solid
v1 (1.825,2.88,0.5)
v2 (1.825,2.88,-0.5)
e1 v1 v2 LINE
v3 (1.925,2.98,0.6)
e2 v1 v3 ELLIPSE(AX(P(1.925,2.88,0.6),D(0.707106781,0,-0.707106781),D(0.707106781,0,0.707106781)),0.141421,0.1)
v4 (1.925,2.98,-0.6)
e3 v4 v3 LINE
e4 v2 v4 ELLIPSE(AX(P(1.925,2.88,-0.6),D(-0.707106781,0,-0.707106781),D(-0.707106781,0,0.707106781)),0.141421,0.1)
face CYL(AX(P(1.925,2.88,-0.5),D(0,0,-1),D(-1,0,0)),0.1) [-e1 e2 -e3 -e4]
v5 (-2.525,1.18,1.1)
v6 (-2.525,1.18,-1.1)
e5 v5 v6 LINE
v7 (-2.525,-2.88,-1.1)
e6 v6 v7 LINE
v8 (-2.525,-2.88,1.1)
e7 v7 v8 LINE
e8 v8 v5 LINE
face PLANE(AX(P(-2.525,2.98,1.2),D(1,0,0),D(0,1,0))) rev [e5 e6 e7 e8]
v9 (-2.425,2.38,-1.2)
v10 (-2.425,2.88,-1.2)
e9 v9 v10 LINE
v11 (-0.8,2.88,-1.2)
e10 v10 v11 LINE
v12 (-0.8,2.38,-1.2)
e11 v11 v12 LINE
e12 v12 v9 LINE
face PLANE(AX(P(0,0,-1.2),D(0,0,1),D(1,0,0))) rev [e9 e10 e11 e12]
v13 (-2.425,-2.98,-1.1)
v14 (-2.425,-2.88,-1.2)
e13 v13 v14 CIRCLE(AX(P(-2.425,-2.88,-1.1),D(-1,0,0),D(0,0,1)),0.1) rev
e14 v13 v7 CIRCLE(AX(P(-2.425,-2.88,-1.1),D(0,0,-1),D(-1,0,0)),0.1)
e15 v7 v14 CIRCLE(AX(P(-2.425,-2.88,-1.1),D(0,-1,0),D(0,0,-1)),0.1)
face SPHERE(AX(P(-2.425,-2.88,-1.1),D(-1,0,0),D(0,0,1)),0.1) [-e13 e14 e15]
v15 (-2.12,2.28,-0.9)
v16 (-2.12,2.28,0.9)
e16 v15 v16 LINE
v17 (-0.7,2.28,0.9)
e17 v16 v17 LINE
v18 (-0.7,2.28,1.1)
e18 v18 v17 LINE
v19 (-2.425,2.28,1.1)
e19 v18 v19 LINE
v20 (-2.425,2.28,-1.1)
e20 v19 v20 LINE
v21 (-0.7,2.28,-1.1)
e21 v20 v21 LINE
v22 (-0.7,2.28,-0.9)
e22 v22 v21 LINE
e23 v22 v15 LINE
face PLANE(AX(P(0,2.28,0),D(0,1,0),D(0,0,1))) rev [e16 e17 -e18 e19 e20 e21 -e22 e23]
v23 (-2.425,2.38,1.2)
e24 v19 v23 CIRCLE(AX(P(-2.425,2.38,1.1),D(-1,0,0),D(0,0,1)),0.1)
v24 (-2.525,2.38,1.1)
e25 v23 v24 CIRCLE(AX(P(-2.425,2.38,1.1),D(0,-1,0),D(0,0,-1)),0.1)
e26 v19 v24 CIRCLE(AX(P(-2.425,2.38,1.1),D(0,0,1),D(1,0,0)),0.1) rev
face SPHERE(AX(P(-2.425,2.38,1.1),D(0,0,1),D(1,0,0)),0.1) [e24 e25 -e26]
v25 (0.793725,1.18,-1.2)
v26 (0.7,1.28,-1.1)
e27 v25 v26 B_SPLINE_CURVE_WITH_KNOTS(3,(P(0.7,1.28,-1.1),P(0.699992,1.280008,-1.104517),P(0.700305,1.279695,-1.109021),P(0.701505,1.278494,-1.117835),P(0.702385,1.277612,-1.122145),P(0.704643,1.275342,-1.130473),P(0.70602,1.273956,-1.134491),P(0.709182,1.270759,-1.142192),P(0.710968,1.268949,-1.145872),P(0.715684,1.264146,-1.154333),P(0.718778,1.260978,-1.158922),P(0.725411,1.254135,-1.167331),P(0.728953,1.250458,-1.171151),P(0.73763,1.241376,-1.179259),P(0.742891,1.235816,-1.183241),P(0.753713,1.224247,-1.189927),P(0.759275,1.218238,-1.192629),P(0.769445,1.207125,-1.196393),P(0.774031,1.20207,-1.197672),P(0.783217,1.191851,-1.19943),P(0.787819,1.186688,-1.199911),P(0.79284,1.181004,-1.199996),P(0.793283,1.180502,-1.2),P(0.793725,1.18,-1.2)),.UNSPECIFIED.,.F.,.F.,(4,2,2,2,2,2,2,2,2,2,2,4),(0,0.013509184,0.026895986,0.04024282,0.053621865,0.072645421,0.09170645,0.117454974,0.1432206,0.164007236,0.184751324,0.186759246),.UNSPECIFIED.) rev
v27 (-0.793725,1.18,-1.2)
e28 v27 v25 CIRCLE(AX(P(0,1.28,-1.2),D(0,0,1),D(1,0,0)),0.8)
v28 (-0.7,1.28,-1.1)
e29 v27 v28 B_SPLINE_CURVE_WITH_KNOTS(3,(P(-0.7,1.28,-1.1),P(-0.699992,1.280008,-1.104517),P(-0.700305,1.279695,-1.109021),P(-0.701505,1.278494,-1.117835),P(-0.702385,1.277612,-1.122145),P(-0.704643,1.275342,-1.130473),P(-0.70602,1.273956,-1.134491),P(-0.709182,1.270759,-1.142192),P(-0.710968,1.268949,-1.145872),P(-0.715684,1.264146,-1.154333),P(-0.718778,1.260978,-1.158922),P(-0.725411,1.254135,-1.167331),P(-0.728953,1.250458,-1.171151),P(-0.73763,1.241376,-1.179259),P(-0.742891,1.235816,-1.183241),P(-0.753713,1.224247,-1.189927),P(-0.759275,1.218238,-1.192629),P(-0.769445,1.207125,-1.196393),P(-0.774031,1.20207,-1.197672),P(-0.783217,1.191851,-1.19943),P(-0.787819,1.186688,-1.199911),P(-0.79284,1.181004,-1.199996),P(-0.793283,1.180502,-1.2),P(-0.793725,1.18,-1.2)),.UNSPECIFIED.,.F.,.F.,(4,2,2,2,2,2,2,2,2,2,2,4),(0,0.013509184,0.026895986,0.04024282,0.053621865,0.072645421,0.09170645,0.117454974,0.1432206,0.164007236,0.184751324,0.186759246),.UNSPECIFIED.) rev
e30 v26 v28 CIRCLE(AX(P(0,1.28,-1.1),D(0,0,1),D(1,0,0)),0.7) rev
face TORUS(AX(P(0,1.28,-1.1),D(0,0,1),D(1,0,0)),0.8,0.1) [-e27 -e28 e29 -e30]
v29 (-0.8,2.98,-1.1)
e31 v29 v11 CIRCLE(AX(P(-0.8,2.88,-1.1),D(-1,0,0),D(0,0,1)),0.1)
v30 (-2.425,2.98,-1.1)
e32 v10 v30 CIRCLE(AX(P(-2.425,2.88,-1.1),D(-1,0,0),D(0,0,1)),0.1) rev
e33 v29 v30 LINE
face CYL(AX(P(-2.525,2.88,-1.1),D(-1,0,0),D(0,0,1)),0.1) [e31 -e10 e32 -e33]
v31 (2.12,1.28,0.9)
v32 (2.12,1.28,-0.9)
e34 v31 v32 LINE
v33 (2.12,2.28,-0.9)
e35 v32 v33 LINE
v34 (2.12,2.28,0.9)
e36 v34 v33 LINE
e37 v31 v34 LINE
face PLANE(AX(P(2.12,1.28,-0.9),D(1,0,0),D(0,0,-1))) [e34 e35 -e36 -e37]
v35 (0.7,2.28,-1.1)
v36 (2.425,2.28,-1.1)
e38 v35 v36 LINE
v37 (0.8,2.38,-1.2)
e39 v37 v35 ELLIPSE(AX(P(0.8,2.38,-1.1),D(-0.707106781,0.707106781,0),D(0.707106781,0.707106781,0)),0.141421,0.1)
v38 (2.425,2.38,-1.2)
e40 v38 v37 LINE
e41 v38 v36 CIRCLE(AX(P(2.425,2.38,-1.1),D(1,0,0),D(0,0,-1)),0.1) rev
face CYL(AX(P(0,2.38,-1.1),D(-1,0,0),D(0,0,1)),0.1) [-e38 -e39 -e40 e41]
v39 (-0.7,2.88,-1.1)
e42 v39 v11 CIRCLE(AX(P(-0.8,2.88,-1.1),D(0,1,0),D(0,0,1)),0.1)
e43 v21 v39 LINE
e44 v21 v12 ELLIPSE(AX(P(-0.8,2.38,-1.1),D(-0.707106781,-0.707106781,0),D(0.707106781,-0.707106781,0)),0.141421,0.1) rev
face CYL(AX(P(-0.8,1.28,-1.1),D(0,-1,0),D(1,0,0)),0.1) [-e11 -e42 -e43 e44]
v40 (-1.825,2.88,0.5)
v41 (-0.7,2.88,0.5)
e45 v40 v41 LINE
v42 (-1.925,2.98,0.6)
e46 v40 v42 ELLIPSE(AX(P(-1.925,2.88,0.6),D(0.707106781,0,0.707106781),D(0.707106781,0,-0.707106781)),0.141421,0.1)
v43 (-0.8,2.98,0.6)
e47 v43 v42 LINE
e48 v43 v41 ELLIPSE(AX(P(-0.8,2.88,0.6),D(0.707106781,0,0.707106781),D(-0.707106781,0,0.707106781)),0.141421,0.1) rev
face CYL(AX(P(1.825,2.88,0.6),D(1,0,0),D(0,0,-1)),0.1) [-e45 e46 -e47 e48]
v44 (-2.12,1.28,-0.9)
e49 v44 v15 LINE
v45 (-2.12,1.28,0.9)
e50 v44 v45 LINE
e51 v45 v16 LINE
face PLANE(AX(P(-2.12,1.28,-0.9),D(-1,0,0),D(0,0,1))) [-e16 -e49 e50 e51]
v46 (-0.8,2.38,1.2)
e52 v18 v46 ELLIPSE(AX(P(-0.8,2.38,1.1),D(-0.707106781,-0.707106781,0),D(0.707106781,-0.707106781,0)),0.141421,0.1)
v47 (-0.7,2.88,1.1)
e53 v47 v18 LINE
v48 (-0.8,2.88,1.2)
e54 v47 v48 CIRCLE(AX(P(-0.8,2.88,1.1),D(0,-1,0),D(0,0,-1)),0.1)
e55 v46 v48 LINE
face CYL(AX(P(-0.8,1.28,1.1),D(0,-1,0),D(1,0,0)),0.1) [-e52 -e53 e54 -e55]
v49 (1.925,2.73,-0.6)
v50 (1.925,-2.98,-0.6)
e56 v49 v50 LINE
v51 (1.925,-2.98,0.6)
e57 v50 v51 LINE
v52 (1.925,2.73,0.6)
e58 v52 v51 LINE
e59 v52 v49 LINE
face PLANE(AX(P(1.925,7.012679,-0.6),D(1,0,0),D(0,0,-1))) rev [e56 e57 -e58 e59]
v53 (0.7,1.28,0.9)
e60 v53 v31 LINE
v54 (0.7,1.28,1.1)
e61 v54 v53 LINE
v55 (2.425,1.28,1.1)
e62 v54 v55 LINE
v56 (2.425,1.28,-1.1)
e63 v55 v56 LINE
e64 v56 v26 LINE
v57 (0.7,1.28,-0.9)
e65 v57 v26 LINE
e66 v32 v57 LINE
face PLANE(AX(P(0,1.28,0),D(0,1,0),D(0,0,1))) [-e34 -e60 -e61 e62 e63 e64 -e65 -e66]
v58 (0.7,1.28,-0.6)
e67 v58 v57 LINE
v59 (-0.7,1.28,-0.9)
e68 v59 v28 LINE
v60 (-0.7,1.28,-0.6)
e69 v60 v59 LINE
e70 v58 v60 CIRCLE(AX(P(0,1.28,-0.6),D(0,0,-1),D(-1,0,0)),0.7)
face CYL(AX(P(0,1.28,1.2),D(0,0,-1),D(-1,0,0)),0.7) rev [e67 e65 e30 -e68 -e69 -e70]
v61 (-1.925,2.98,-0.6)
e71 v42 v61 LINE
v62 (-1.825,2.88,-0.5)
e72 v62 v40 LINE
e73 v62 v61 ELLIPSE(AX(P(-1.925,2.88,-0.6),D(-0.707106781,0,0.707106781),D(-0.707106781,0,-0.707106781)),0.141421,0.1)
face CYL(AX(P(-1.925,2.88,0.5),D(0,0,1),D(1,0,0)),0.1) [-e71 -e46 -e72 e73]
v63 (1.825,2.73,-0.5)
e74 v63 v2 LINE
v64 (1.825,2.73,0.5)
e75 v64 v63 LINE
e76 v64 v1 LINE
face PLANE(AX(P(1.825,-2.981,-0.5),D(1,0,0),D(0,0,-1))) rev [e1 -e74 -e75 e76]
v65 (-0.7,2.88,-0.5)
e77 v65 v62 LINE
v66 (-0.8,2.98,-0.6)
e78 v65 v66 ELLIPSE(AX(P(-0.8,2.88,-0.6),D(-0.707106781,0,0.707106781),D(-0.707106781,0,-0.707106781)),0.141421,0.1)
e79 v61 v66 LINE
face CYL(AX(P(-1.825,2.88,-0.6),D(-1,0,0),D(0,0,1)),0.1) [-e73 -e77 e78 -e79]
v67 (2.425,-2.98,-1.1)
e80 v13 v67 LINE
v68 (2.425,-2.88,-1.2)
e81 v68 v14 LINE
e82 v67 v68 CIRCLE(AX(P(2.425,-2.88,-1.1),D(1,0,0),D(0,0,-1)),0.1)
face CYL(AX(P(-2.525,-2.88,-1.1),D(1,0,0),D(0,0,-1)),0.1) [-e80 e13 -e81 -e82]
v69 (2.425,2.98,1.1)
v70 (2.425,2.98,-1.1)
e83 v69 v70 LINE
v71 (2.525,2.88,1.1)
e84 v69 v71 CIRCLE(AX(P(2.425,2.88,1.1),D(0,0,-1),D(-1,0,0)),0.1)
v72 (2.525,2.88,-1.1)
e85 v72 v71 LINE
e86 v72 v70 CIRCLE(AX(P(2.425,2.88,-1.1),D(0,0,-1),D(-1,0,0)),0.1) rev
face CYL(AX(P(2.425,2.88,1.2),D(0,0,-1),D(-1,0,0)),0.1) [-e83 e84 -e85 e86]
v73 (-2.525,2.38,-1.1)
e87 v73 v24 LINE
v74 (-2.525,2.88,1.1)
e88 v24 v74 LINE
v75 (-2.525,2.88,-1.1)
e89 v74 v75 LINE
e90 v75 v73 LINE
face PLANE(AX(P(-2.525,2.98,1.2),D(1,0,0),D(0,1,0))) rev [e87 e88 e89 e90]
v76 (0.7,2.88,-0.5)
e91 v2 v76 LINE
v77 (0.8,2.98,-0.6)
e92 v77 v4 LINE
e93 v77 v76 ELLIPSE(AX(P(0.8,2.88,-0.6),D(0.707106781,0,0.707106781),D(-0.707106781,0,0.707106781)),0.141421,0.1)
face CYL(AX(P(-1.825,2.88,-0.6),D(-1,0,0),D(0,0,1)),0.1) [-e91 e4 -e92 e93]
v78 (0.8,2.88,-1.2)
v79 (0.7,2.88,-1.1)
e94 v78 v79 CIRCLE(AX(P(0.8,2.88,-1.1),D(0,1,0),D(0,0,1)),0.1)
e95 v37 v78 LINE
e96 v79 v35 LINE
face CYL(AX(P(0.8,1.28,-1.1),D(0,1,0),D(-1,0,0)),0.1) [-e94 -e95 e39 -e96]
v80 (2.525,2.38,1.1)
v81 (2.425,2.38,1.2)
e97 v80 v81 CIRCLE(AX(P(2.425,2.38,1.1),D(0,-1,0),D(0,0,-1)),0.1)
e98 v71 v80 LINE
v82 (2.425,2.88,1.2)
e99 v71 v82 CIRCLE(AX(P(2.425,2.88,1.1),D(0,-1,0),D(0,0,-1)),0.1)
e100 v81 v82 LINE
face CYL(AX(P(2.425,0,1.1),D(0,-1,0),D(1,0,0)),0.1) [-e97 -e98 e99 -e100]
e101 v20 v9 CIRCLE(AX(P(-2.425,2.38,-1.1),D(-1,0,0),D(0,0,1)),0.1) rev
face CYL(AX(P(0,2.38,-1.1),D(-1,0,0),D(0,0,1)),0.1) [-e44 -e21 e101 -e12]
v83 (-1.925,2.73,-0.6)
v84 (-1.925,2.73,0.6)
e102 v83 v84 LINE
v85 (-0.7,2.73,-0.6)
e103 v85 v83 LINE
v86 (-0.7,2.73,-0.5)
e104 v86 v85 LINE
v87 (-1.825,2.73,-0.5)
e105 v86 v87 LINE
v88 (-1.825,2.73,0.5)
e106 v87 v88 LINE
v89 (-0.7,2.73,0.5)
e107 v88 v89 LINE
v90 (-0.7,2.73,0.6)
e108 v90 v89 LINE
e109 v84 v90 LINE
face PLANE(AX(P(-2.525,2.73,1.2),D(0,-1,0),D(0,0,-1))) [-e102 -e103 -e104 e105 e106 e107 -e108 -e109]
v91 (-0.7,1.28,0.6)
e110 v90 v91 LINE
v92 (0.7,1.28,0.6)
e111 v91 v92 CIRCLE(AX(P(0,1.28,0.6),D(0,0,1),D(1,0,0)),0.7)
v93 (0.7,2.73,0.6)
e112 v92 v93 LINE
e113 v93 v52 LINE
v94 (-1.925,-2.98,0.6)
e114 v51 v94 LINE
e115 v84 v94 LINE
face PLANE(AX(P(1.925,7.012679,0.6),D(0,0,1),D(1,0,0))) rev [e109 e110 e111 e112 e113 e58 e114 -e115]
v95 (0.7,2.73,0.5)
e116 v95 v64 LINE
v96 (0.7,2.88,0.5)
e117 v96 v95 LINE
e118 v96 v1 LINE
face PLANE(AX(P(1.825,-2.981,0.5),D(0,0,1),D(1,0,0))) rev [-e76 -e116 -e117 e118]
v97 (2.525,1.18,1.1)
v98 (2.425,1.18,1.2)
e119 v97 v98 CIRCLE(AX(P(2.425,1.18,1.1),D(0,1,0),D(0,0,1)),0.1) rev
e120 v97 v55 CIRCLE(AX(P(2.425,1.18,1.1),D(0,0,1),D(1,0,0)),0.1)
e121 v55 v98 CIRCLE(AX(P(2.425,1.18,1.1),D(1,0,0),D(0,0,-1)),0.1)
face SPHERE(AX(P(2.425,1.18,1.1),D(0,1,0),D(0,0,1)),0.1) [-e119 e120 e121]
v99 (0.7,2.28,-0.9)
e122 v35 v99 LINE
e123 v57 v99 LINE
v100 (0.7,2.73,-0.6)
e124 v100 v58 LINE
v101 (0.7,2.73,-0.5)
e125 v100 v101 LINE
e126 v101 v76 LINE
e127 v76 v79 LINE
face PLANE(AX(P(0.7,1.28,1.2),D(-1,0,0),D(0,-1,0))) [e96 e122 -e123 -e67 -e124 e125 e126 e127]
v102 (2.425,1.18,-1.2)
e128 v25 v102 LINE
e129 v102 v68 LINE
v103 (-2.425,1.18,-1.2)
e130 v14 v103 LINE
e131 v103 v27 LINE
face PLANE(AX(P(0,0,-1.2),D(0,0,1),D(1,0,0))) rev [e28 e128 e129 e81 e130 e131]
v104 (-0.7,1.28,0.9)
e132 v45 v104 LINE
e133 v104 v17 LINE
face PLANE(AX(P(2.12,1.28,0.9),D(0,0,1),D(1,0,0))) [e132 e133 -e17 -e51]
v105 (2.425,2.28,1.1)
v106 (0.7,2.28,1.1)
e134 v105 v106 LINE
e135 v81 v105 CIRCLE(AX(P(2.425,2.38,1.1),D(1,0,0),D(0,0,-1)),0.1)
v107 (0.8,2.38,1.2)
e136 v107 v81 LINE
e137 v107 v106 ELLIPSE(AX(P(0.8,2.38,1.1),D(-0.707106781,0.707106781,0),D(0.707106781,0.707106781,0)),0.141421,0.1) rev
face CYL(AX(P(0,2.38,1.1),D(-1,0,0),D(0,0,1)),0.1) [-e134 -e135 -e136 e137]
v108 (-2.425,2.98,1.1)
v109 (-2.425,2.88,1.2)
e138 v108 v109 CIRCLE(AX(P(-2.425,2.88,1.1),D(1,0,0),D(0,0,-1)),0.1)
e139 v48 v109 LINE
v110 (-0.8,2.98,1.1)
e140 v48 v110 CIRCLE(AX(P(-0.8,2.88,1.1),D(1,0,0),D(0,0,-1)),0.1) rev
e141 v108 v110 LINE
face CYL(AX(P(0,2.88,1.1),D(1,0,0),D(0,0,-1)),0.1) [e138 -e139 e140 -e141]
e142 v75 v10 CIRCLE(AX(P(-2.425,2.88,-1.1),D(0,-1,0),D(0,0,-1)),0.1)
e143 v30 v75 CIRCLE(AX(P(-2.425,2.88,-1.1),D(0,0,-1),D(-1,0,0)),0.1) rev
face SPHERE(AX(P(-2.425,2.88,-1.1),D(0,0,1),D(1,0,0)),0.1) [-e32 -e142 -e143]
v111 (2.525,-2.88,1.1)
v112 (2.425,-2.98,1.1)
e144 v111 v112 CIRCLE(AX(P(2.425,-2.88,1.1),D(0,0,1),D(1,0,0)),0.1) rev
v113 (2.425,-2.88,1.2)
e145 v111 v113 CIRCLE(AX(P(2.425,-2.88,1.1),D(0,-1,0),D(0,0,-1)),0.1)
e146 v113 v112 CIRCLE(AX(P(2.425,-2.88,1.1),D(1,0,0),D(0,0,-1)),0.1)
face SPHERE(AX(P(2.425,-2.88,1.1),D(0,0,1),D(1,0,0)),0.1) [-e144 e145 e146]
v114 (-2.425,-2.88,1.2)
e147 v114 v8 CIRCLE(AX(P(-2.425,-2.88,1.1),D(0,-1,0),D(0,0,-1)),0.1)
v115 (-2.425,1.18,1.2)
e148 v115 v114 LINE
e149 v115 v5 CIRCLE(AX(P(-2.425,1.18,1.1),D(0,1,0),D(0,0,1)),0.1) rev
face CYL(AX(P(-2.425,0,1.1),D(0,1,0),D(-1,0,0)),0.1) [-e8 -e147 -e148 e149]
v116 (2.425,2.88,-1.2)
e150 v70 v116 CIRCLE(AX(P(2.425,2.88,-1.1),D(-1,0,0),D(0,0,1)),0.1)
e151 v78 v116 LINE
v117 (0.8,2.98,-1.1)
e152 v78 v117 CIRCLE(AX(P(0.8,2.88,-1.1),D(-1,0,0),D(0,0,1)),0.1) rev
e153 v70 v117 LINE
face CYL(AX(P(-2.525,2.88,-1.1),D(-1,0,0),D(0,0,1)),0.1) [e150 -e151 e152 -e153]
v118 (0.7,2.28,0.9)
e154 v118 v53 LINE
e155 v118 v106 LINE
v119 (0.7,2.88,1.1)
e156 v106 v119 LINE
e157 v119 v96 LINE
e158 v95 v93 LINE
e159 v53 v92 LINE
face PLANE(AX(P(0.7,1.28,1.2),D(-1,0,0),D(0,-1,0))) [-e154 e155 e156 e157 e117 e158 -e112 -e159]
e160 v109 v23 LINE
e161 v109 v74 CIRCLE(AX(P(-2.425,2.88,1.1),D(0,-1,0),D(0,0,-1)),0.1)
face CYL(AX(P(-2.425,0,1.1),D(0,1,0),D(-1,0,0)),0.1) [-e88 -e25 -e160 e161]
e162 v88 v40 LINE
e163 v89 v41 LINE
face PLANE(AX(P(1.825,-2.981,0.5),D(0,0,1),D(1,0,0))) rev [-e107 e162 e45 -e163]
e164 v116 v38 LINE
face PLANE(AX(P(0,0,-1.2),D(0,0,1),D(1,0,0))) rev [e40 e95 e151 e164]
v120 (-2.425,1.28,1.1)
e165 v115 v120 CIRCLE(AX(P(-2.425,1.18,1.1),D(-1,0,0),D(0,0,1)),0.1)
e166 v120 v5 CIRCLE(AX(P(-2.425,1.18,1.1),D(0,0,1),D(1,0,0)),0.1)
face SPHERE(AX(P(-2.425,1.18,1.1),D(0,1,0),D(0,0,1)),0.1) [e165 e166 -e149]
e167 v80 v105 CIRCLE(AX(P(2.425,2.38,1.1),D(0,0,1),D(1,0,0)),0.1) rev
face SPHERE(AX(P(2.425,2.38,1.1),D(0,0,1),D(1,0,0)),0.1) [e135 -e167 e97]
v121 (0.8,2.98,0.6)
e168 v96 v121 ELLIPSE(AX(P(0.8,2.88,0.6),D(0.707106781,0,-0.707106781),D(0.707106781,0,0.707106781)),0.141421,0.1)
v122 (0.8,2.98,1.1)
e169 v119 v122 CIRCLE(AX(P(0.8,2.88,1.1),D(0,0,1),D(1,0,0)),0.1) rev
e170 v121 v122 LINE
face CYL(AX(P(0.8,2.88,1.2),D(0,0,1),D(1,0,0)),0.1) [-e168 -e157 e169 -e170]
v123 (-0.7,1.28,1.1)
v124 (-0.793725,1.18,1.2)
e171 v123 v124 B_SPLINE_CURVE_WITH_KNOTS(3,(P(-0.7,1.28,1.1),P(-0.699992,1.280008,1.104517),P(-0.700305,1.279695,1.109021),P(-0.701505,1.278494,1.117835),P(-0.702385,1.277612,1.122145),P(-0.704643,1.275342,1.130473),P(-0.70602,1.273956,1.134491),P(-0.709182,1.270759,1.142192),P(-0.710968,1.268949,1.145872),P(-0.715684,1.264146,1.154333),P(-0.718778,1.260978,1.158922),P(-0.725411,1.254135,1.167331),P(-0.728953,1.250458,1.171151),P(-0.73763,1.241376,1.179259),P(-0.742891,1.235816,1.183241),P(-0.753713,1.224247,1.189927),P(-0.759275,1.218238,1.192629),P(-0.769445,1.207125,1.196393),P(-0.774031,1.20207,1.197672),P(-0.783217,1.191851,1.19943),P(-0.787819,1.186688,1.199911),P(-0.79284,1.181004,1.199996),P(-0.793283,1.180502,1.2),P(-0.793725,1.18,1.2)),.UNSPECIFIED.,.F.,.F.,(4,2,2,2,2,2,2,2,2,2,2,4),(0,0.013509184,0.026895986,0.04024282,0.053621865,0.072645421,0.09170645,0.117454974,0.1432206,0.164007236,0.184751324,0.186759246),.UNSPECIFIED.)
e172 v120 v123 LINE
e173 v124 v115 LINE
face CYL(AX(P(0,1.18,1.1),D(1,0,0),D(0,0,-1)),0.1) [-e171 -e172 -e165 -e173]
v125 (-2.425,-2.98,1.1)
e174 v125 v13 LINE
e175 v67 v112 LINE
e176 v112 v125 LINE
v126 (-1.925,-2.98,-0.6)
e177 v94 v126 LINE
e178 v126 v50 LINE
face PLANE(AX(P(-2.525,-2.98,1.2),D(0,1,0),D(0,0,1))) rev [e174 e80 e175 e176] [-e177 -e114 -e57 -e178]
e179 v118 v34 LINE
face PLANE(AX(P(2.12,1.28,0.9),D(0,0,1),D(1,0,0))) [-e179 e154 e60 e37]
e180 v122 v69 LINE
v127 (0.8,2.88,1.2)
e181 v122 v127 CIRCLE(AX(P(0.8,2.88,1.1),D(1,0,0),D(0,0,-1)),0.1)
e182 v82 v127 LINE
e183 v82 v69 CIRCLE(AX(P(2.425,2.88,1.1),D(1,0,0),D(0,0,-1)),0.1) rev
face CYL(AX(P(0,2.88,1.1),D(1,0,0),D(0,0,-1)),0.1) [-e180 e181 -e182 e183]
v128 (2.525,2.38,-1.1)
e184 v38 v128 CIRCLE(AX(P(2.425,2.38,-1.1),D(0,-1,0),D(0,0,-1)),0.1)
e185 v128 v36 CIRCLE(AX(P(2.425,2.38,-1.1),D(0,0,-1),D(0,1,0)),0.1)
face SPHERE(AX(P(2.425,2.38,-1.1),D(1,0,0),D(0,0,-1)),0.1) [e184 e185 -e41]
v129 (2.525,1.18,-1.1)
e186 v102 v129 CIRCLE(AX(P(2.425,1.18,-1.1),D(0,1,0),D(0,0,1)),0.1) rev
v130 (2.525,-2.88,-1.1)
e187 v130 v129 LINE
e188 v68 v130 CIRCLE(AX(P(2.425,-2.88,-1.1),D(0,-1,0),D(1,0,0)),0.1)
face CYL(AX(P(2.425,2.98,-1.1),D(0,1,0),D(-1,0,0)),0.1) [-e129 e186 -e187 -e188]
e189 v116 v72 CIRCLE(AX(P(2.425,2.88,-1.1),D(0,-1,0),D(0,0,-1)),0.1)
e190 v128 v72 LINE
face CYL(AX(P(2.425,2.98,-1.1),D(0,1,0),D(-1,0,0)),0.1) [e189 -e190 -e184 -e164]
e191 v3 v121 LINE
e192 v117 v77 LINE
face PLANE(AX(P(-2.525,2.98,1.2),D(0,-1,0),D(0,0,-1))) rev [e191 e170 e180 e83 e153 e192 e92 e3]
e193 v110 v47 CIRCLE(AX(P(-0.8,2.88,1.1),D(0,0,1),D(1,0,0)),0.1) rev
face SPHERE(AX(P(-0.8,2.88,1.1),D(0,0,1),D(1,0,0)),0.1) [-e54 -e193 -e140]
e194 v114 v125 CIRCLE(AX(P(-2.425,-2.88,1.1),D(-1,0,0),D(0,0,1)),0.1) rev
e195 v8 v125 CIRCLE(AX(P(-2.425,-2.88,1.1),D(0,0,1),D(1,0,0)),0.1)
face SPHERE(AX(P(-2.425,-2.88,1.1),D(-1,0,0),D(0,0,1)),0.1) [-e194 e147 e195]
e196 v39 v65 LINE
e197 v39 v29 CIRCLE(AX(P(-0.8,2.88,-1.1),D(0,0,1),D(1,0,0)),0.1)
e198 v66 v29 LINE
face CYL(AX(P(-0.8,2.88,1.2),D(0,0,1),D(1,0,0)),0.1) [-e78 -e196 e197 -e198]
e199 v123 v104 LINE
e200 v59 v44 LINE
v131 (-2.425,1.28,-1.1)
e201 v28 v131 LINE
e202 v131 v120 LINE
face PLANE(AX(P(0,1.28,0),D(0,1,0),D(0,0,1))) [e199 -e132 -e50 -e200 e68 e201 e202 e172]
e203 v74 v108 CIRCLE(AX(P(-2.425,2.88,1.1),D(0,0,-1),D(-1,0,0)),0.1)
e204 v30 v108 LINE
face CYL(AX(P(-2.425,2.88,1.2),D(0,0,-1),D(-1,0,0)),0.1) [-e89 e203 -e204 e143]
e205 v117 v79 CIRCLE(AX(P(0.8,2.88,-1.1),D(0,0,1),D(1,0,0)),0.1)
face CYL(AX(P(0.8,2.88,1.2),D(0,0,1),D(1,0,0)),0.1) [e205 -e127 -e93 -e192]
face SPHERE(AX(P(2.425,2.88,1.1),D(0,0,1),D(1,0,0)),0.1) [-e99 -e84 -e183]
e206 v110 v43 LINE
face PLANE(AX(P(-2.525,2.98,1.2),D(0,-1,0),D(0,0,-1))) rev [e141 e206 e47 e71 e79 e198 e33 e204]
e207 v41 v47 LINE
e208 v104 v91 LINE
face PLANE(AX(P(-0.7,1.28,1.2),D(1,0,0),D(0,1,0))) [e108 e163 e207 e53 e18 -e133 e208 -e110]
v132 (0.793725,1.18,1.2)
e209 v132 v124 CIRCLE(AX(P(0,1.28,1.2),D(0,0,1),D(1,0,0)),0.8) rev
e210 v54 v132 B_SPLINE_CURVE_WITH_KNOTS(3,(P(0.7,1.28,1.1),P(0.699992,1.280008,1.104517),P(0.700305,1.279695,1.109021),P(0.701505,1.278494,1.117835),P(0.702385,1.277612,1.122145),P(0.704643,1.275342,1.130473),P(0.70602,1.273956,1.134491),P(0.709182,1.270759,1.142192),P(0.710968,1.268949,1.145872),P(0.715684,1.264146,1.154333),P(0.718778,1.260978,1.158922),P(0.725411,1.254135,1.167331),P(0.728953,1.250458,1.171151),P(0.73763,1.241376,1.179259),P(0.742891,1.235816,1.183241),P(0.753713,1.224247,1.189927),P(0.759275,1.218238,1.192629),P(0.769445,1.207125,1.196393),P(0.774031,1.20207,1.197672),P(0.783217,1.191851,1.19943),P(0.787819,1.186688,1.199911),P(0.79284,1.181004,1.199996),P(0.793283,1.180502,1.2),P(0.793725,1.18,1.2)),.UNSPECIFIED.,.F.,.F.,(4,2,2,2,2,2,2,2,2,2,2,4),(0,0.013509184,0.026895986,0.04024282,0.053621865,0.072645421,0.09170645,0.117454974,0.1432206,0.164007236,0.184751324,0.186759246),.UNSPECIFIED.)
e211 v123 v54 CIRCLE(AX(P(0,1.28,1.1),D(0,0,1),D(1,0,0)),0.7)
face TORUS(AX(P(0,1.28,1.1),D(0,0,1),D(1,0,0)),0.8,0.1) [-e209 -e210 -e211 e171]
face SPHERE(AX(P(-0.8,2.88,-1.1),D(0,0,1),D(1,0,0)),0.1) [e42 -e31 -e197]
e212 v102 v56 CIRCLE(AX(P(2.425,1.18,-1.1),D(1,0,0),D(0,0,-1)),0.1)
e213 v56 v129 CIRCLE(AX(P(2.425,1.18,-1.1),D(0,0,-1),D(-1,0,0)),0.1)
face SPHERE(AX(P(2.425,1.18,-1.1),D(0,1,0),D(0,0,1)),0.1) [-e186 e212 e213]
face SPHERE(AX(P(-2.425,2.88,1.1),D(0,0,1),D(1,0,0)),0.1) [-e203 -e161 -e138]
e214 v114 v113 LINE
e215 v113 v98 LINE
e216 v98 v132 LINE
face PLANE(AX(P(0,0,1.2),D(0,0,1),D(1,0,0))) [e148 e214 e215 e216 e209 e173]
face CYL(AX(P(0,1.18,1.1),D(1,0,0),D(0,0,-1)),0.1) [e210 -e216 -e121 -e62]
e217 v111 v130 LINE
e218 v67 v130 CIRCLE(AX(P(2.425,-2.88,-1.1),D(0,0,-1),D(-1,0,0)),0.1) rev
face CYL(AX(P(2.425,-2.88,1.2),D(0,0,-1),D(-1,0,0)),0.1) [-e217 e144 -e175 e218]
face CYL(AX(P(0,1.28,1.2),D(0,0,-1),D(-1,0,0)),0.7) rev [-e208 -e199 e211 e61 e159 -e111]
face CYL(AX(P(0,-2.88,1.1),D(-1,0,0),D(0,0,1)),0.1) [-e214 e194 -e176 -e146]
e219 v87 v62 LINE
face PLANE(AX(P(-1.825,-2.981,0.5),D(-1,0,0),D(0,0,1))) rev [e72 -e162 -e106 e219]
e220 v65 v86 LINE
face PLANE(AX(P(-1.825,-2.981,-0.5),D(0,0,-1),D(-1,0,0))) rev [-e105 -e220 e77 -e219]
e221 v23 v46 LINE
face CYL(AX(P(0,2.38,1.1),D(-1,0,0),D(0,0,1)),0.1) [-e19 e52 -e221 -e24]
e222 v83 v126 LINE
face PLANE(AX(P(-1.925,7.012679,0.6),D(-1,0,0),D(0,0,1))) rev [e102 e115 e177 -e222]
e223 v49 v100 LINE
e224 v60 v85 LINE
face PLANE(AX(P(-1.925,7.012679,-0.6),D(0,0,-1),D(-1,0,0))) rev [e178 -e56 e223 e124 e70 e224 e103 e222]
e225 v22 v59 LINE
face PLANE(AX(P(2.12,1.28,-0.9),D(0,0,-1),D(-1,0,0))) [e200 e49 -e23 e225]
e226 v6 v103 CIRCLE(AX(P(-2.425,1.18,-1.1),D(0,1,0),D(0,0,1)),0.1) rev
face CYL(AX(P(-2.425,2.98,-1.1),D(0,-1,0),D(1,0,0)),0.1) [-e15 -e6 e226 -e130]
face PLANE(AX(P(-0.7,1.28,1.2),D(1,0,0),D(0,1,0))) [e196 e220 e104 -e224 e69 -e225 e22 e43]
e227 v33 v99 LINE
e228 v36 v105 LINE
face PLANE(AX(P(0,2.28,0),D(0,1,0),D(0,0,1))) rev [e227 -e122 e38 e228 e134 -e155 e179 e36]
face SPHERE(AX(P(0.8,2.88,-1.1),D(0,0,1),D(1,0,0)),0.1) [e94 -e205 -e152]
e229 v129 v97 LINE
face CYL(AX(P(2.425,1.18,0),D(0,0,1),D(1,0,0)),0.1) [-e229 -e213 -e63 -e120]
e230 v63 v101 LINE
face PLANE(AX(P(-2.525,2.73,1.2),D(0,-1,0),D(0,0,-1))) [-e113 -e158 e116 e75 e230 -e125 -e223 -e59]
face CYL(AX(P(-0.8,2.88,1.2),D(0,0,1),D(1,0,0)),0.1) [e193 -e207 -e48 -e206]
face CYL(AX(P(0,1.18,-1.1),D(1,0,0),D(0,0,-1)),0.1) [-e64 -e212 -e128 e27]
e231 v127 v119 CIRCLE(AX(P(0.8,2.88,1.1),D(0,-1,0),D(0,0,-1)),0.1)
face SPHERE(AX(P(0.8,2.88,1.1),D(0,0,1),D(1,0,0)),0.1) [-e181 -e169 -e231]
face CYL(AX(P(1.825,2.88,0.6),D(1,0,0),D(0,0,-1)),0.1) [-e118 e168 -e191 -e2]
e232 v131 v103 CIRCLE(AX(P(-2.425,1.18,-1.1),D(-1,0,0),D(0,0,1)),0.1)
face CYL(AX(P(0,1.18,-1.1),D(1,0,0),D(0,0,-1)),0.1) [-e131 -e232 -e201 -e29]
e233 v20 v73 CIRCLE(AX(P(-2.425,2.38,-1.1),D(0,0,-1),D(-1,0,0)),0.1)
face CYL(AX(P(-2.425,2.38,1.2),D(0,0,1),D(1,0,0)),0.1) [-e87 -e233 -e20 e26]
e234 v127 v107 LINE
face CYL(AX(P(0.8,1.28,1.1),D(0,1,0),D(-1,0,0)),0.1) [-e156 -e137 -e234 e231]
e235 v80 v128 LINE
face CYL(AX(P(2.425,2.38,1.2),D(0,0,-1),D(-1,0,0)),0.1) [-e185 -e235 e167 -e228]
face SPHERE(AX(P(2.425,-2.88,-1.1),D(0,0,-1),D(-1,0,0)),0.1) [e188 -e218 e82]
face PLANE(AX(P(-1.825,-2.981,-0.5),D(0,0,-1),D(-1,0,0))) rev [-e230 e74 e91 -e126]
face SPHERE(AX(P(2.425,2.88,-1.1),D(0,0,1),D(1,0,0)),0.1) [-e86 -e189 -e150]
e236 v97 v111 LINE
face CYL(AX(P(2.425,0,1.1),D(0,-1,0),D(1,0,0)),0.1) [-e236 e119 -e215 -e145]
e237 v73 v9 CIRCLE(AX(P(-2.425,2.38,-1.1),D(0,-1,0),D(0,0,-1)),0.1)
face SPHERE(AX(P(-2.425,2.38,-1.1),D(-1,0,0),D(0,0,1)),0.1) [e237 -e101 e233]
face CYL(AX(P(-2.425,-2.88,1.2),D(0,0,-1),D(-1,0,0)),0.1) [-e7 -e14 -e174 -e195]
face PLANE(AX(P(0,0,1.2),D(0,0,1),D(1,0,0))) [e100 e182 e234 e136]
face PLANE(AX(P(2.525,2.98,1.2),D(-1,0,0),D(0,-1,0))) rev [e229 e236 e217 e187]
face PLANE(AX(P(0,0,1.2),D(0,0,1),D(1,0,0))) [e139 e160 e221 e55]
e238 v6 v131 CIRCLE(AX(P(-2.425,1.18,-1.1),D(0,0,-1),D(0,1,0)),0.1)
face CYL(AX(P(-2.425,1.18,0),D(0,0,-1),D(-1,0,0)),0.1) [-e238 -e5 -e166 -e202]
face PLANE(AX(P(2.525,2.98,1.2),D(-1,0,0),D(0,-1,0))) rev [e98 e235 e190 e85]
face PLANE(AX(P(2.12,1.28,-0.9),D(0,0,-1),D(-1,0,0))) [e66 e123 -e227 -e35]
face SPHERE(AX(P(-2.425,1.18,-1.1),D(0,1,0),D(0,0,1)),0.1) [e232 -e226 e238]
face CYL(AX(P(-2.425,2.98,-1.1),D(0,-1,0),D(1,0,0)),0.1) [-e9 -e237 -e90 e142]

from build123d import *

# Parameters (mm, degrees)
SKETCH1_W          = 5.05
SKETCH1_H          = 5.96
MAIN_BODY_DEPTH    = 1.2
SKETCH2_W          = 5.05
SKETCH2_H          = 2.4
SKETCH2_W_2        = 4.24
SKETCH2_H_2        = 1.8
CUT_EXTRUDE1_DEPTH = 1
CUT_EXTRUDE2_START = -2.4
CUT_EXTRUDE2_DEPTH = 2.4
SKETCH4_W          = 3.85
SKETCH4_H          = 1.2
CUT_EXTRUDE3_DEPTH = 5.71
CUT_EXTRUDE4_START = -0.25
SKETCH5_W          = 3.65
SKETCH5_H          = 1
CUT_EXTRUDE4_DEPTH = 0.25
FILLET1_R          = 0.1
FILLET2_R          = 0.1


# Read off the part's stored shape, not the designer's step: Cut-Extrude2
with BuildPart() as part:
    # Sketch1 → Main Body (new, symmetric)
    with BuildSketch(Plane.XY):
        Rectangle(SKETCH1_W, SKETCH1_H)
    extrude(amount=MAIN_BODY_DEPTH, both=True)

    # Sketch2 → Cut-Extrude1 (cut)
    with BuildSketch(Plane(origin=(0, 2.28, 0), x_dir=(1, 0, 0), z_dir=(0, 1, 0))):
        Rectangle(SKETCH2_W, SKETCH2_H)
        Rectangle(SKETCH2_W_2, SKETCH2_H_2, mode=Mode.SUBTRACT)
    extrude(amount=-CUT_EXTRUDE1_DEPTH, mode=Mode.SUBTRACT)

    # Cut-Extrude2 outline → Cut-Extrude2 (cut)
    with BuildSketch(Plane.XY.offset(1.2).offset(CUT_EXTRUDE2_START)):
        with BuildLine():
            ThreePointArc((-0.7, 1.28), (0, 0.58), (0.7, 1.28))
            Line((0.7, 1.28), (0.7, 2.98))
            Line((0.7, 2.98), (-0.7, 2.98))
            Line((-0.7, 2.98), (-0.7, 1.28))
        make_face()
    extrude(amount=CUT_EXTRUDE2_DEPTH, mode=Mode.SUBTRACT)

    # Sketch4 → Cut-Extrude3 (cut)
    with BuildSketch(Plane.XZ.offset(2.98)):
        Rectangle(SKETCH4_W, SKETCH4_H)
    extrude(amount=-CUT_EXTRUDE3_DEPTH, mode=Mode.SUBTRACT)

    # Sketch5 → Cut-Extrude4 (cut)
    with BuildSketch(Plane(origin=(0, 2.98, 0), x_dir=(1, 0, 0), z_dir=(0, 1, 0)).offset(CUT_EXTRUDE4_START)):
        Rectangle(SKETCH5_W, SKETCH5_H)
    extrude(amount=CUT_EXTRUDE4_DEPTH, mode=Mode.SUBTRACT)

    # Fillet1
    fillet1_edges = [part.edges().sort_by_distance(p)[0] for p in [
        (-1.2625, 2.98, 0.5),
        (-0.7, 2.98, 0.85),
        (-1.6125, 2.98, 1.2),
        (-2.525, 2.98, 0),
        (-1.6125, 2.98, -1.2),
        (-0.7, 2.98, -0.85),
        (-1.2625, 2.98, -0.5),
        (-1.825, 2.98, 0),
        (1.2625, 2.98, -0.5),
        (0.7, 2.98, -0.85),
        (1.6125, 2.98, -1.2),
        (2.525, 2.98, 0),
        (1.6125, 2.98, 1.2),
        (0.7, 2.98, 0.85),
        (1.2625, 2.98, 0.5),
        (1.825, 2.98, 0),
        (2.525, -2.98, 0),
        (2.525, 1.28, 0),
        (-1.6125, 1.28, -1.2),
        (0, -2.98, -1.2),
        (2.525, -0.85, -1.2),
        (1.6125, 1.28, -1.2),
        (0, 0.58, -1.2),
        (1.6125, 1.28, 1.2),
        (2.525, -0.85, 1.2),
        (0, -2.98, 1.2),
        (-1.6125, 1.28, 1.2),
        (0, 0.58, 1.2),
        (-2.525, -0.85, 1.2),
        (-2.525, -2.98, 0),
        (-2.525, -0.85, -1.2),
        (-2.525, 1.28, 0),
    ]]
    fillet(fillet1_edges, radius=FILLET1_R)

    # Fillet2
    # the kernel refuses this fillet: 0.1 mm, written as the material it takes off along each edge
    with BuildSketch(Plane(origin=(-0.8, 2.88, -1.1), x_dir=(0, 0, -1), z_dir=(1, 0, 0))) as fillet2_piece_1_section:
        Polygon((0, 0), (FILLET2_R, 0), (FILLET2_R, FILLET2_R), (0, FILLET2_R), align=None)
    fillet2_piece_1 = extrude(amount=FILLET2_R, mode=Mode.PRIVATE)
    fillet2_piece_1 = fillet2_piece_1 - Plane(origin=(-0.8, 2.88, -1.1), x_dir=(0, -0.7071067811865475, 0.7071067811865475), z_dir=(1, 0, 0)) * Sphere(FILLET2_R, mode=Mode.PRIVATE)
    add(fillet2_piece_1, mode=Mode.SUBTRACT)
    with BuildSketch(Plane(origin=(-2.425, 2.88, -1.1), x_dir=(0, 0, -1), z_dir=(-1, 0, 0))) as fillet2_piece_2_section:
        Polygon((0, 0), (FILLET2_R, 0), (FILLET2_R, -FILLET2_R), (0, -FILLET2_R), align=None)
    fillet2_piece_2 = extrude(amount=FILLET2_R, mode=Mode.PRIVATE)
    fillet2_piece_2 = fillet2_piece_2 - Plane(origin=(-2.425, 2.88, -1.1), x_dir=(0, -0.7071067811865475, 0.7071067811865475), z_dir=(-1, 0, 0)) * Sphere(FILLET2_R, mode=Mode.PRIVATE)
    add(fillet2_piece_2, mode=Mode.SUBTRACT)
    with BuildSketch(Plane(origin=(-2.425, 2.88, 1.1), x_dir=(-1, 0, 0), z_dir=(0, 0, 1))) as fillet2_piece_3_section:
        Polygon((0, 0), (FILLET2_R, 0), (FILLET2_R, -FILLET2_R), (0, -FILLET2_R), align=None)
    fillet2_piece_3 = extrude(amount=FILLET2_R, mode=Mode.PRIVATE)
    fillet2_piece_3 = fillet2_piece_3 - Plane(origin=(-2.425, 2.88, 1.1), x_dir=(0.7071067811865476, -0.7071067811865475, 0), z_dir=(0, 0, 1)) * Sphere(FILLET2_R, mode=Mode.PRIVATE)
    add(fillet2_piece_3, mode=Mode.SUBTRACT)
    with BuildSketch(Plane(origin=(-0.8, 2.88, 1.1), x_dir=(0, 0, 1), z_dir=(1, 0, 0))) as fillet2_piece_4_section:
        Polygon((0, 0), (FILLET2_R, 0), (FILLET2_R, -FILLET2_R), (0, -FILLET2_R), align=None)
    fillet2_piece_4 = extrude(amount=FILLET2_R, mode=Mode.PRIVATE)
    fillet2_piece_4 = fillet2_piece_4 - Plane(origin=(-0.8, 2.88, 1.1), x_dir=(0, -0.7071067811865475, -0.7071067811865475), z_dir=(1, 0, 0)) * Sphere(FILLET2_R, mode=Mode.PRIVATE)
    add(fillet2_piece_4, mode=Mode.SUBTRACT)
    with BuildSketch(Plane(origin=(0.8, 2.88, 1.1), x_dir=(0, 0, 1), z_dir=(-1, 0, 0))) as fillet2_piece_5_section:
        Polygon((0, 0), (FILLET2_R, 0), (FILLET2_R, FILLET2_R), (0, FILLET2_R), align=None)
    fillet2_piece_5 = extrude(amount=FILLET2_R, mode=Mode.PRIVATE)
    fillet2_piece_5 = fillet2_piece_5 - Plane(origin=(0.8, 2.88, 1.1), x_dir=(0, -0.7071067811865475, -0.7071067811865475), z_dir=(-1, 0, 0)) * Sphere(FILLET2_R, mode=Mode.PRIVATE)
    add(fillet2_piece_5, mode=Mode.SUBTRACT)
    with BuildSketch(Plane(origin=(2.425, 2.88, 1.1), x_dir=(1, 0, 0), z_dir=(0, 0, 1))) as fillet2_piece_6_section:
        Polygon((0, 0), (FILLET2_R, 0), (FILLET2_R, FILLET2_R), (0, FILLET2_R), align=None)
    fillet2_piece_6 = extrude(amount=FILLET2_R, mode=Mode.PRIVATE)
    fillet2_piece_6 = fillet2_piece_6 - Plane(origin=(2.425, 2.88, 1.1), x_dir=(-0.7071067811865475, -0.7071067811865477, 0), z_dir=(0, 0, 1)) * Sphere(FILLET2_R, mode=Mode.PRIVATE)
    add(fillet2_piece_6, mode=Mode.SUBTRACT)
    with BuildSketch(Plane(origin=(2.425, 2.88, -1.1), x_dir=(1, 0, 0), z_dir=(0, 0, -1))) as fillet2_piece_7_section:
        Polygon((0, 0), (FILLET2_R, 0), (FILLET2_R, -FILLET2_R), (0, -FILLET2_R), align=None)
    fillet2_piece_7 = extrude(amount=FILLET2_R, mode=Mode.PRIVATE)
    fillet2_piece_7 = fillet2_piece_7 - Plane(origin=(2.425, 2.88, -1.1), x_dir=(-0.7071067811865475, -0.7071067811865477, 0), z_dir=(0, 0, -1)) * Sphere(FILLET2_R, mode=Mode.PRIVATE)
    add(fillet2_piece_7, mode=Mode.SUBTRACT)
    with BuildSketch(Plane(origin=(0.8, 2.88, -1.1), x_dir=(0, 0, -1), z_dir=(-1, 0, 0))) as fillet2_piece_8_section:
        Polygon((0, 0), (FILLET2_R, 0), (FILLET2_R, -FILLET2_R), (0, -FILLET2_R), align=None)
    fillet2_piece_8 = extrude(amount=FILLET2_R, mode=Mode.PRIVATE)
    fillet2_piece_8 = fillet2_piece_8 - Plane(origin=(0.8, 2.88, -1.1), x_dir=(0, -0.7071067811865475, 0.7071067811865475), z_dir=(-1, 0, 0)) * Sphere(FILLET2_R, mode=Mode.PRIVATE)
    add(fillet2_piece_8, mode=Mode.SUBTRACT)
    with BuildSketch(Plane(origin=(-2.425, 2.38, 1.1), x_dir=(0, 0, 1), z_dir=(0, -1, 0))) as fillet2_piece_9_section:
        Polygon((0, 0), (FILLET2_R, 0), (FILLET2_R, FILLET2_R), (0, FILLET2_R), align=None)
    fillet2_piece_9 = extrude(amount=FILLET2_R, mode=Mode.PRIVATE)
    fillet2_piece_9 = fillet2_piece_9 - Plane(origin=(-2.425, 2.38, 1.1), x_dir=(0.7071067811865475, 0, -0.7071067811865475), z_dir=(0, -1, 0)) * Sphere(FILLET2_R, mode=Mode.PRIVATE)
    add(fillet2_piece_9, mode=Mode.SUBTRACT)
    with BuildSketch(Plane(origin=(-2.425, 2.38, -1.1), x_dir=(0, -1, 0), z_dir=(0, 0, -1))) as fillet2_piece_10_section:
        Polygon((0, 0), (FILLET2_R, 0), (FILLET2_R, FILLET2_R), (0, FILLET2_R), align=None)
    fillet2_piece_10 = extrude(amount=FILLET2_R, mode=Mode.PRIVATE)
    fillet2_piece_10 = fillet2_piece_10 - Plane(origin=(-2.425, 2.38, -1.1), x_dir=(0.7071067811865475, 0.7071067811865477, 0), z_dir=(0, 0, -1)) * Sphere(FILLET2_R, mode=Mode.PRIVATE)
    add(fillet2_piece_10, mode=Mode.SUBTRACT)
    with BuildSketch(Plane(origin=(2.425, 2.38, -1.1), x_dir=(0, -1, 0), z_dir=(0, 0, -1))) as fillet2_piece_11_section:
        Polygon((0, 0), (FILLET2_R, 0), (FILLET2_R, -FILLET2_R), (0, -FILLET2_R), align=None)
    fillet2_piece_11 = extrude(amount=FILLET2_R, mode=Mode.PRIVATE)
    fillet2_piece_11 = fillet2_piece_11 - Plane(origin=(2.425, 2.38, -1.1), x_dir=(-0.7071067811865476, 0.7071067811865475, 0), z_dir=(0, 0, -1)) * Sphere(FILLET2_R, mode=Mode.PRIVATE)
    add(fillet2_piece_11, mode=Mode.SUBTRACT)
    with BuildSketch(Plane(origin=(2.425, 2.38, 1.1), x_dir=(0, -1, 0), z_dir=(0, 0, 1))) as fillet2_piece_12_section:
        Polygon((0, 0), (FILLET2_R, 0), (FILLET2_R, FILLET2_R), (0, FILLET2_R), align=None)
    fillet2_piece_12 = extrude(amount=FILLET2_R, mode=Mode.PRIVATE)
    fillet2_piece_12 = fillet2_piece_12 - Plane(origin=(2.425, 2.38, 1.1), x_dir=(-0.7071067811865476, 0.7071067811865475, 0), z_dir=(0, 0, 1)) * Sphere(FILLET2_R, mode=Mode.PRIVATE)
    add(fillet2_piece_12, mode=Mode.SUBTRACT)
    with BuildSketch(Plane(origin=(-0.7, 2.88, 1.2), x_dir=(0, 0, -1), z_dir=(0, -1, 0)), Plane(origin=(0.7, 2.03, 1.2), x_dir=(0, 0, -1), z_dir=(0, 1, 0))) as fillet2_piece_13:
        with BuildLine():
            CenterArc((FILLET2_R, -FILLET2_R), FILLET2_R, 90, 90)
            Line((0, -FILLET2_R), (0, 0))
            Line((0, 0), (FILLET2_R, 0))
        make_face()
    extrude(amount=0.85, mode=Mode.SUBTRACT)
    with BuildSketch(Plane(origin=(-2.525, 2.38, 1.2), x_dir=(1, 0, 0), z_dir=(0, 1, 0)), Plane(origin=(-2.525, 2.38, -1.2), x_dir=(0, 0, 1), z_dir=(0, 1, 0)), Plane(origin=(2.525, 2.88, 1.2), x_dir=(-1, 0, 0), z_dir=(0, -1, 0))) as fillet2_piece_14:
        with BuildLine():
            CenterArc((FILLET2_R, FILLET2_R), FILLET2_R, 180, 90)
            Line((0, FILLET2_R), (0, 0))
            Line((0, 0), (FILLET2_R, 0))
        make_face()
    extrude(amount=0.5, mode=Mode.SUBTRACT)
    with BuildSketch(Plane(origin=(2.525, 2.88, -1.2), x_dir=(-1, 0, 0), z_dir=(0, -1, 0))) as fillet2_piece_15:
        with BuildLine():
            CenterArc((FILLET2_R, -FILLET2_R), FILLET2_R, 90, 90)
            Line((0, -FILLET2_R), (0, 0))
            Line((0, 0), (FILLET2_R, 0))
        make_face()
    extrude(amount=0.5, mode=Mode.SUBTRACT)
    with BuildSketch(Plane(origin=(0.7, 2.03, -1.2), x_dir=(0, 0, 1), z_dir=(0, 1, 0)), Plane(origin=(-0.7, 2.88, -1.2), x_dir=(0, 0, 1), z_dir=(0, -1, 0))) as fillet2_piece_16:
        with BuildLine():
            CenterArc((FILLET2_R, FILLET2_R), FILLET2_R, 180, 90)
            Line((0, FILLET2_R), (0, 0))
            Line((0, 0), (FILLET2_R, 0))
        make_face()
    extrude(amount=0.85, mode=Mode.SUBTRACT)
    with BuildSketch(Plane(origin=(2.525, 2.28, 1.1), x_dir=(-1, 0, 0), z_dir=(0, 0, -1))) as fillet2_piece_17:
        with BuildLine():
            CenterArc((FILLET2_R, FILLET2_R), FILLET2_R, 180, 90)
            Line((0, FILLET2_R), (0, 0))
            Line((0, 0), (FILLET2_R, 0))
        make_face()
    extrude(amount=2.2, mode=Mode.SUBTRACT)
    with BuildSketch(Plane(origin=(2.425, 2.28, -1.2), x_dir=(0, 0, 1), z_dir=(-1, 0, 0))) as fillet2_piece_18:
        with BuildLine():
            CenterArc((FILLET2_R, FILLET2_R), FILLET2_R, 180, 90)
            Line((0, FILLET2_R), (0, 0))
            Line((0, 0), (FILLET2_R, 0))
        make_face()
    extrude(amount=1.975, mode=Mode.SUBTRACT)
    with BuildSketch(Plane(origin=(-2.525, 2.28, -1.1), x_dir=(0, 1, 0), z_dir=(0, 0, 1))) as fillet2_piece_19:
        with BuildLine():
            CenterArc((FILLET2_R, -FILLET2_R), FILLET2_R, 90, 90)
            Line((0, -FILLET2_R), (0, 0))
            Line((0, 0), (FILLET2_R, 0))
        make_face()
    extrude(amount=2.2, mode=Mode.SUBTRACT)
    with BuildSketch(Plane(origin=(-2.425, 2.28, 1.2), x_dir=(0, 1, 0), z_dir=(1, 0, 0)), Plane(origin=(-0.45, 2.28, -1.2), x_dir=(0, 1, 0), z_dir=(-1, 0, 0)), Plane(origin=(0.45, 2.28, 1.2), x_dir=(0, 1, 0), z_dir=(1, 0, 0))) as fillet2_piece_20:
        with BuildLine():
            CenterArc((FILLET2_R, -FILLET2_R), FILLET2_R, 90, 90)
            Line((0, -FILLET2_R), (0, 0))
            Line((0, 0), (FILLET2_R, 0))
        make_face()
    extrude(amount=1.975, mode=Mode.SUBTRACT)


solid = part.part
